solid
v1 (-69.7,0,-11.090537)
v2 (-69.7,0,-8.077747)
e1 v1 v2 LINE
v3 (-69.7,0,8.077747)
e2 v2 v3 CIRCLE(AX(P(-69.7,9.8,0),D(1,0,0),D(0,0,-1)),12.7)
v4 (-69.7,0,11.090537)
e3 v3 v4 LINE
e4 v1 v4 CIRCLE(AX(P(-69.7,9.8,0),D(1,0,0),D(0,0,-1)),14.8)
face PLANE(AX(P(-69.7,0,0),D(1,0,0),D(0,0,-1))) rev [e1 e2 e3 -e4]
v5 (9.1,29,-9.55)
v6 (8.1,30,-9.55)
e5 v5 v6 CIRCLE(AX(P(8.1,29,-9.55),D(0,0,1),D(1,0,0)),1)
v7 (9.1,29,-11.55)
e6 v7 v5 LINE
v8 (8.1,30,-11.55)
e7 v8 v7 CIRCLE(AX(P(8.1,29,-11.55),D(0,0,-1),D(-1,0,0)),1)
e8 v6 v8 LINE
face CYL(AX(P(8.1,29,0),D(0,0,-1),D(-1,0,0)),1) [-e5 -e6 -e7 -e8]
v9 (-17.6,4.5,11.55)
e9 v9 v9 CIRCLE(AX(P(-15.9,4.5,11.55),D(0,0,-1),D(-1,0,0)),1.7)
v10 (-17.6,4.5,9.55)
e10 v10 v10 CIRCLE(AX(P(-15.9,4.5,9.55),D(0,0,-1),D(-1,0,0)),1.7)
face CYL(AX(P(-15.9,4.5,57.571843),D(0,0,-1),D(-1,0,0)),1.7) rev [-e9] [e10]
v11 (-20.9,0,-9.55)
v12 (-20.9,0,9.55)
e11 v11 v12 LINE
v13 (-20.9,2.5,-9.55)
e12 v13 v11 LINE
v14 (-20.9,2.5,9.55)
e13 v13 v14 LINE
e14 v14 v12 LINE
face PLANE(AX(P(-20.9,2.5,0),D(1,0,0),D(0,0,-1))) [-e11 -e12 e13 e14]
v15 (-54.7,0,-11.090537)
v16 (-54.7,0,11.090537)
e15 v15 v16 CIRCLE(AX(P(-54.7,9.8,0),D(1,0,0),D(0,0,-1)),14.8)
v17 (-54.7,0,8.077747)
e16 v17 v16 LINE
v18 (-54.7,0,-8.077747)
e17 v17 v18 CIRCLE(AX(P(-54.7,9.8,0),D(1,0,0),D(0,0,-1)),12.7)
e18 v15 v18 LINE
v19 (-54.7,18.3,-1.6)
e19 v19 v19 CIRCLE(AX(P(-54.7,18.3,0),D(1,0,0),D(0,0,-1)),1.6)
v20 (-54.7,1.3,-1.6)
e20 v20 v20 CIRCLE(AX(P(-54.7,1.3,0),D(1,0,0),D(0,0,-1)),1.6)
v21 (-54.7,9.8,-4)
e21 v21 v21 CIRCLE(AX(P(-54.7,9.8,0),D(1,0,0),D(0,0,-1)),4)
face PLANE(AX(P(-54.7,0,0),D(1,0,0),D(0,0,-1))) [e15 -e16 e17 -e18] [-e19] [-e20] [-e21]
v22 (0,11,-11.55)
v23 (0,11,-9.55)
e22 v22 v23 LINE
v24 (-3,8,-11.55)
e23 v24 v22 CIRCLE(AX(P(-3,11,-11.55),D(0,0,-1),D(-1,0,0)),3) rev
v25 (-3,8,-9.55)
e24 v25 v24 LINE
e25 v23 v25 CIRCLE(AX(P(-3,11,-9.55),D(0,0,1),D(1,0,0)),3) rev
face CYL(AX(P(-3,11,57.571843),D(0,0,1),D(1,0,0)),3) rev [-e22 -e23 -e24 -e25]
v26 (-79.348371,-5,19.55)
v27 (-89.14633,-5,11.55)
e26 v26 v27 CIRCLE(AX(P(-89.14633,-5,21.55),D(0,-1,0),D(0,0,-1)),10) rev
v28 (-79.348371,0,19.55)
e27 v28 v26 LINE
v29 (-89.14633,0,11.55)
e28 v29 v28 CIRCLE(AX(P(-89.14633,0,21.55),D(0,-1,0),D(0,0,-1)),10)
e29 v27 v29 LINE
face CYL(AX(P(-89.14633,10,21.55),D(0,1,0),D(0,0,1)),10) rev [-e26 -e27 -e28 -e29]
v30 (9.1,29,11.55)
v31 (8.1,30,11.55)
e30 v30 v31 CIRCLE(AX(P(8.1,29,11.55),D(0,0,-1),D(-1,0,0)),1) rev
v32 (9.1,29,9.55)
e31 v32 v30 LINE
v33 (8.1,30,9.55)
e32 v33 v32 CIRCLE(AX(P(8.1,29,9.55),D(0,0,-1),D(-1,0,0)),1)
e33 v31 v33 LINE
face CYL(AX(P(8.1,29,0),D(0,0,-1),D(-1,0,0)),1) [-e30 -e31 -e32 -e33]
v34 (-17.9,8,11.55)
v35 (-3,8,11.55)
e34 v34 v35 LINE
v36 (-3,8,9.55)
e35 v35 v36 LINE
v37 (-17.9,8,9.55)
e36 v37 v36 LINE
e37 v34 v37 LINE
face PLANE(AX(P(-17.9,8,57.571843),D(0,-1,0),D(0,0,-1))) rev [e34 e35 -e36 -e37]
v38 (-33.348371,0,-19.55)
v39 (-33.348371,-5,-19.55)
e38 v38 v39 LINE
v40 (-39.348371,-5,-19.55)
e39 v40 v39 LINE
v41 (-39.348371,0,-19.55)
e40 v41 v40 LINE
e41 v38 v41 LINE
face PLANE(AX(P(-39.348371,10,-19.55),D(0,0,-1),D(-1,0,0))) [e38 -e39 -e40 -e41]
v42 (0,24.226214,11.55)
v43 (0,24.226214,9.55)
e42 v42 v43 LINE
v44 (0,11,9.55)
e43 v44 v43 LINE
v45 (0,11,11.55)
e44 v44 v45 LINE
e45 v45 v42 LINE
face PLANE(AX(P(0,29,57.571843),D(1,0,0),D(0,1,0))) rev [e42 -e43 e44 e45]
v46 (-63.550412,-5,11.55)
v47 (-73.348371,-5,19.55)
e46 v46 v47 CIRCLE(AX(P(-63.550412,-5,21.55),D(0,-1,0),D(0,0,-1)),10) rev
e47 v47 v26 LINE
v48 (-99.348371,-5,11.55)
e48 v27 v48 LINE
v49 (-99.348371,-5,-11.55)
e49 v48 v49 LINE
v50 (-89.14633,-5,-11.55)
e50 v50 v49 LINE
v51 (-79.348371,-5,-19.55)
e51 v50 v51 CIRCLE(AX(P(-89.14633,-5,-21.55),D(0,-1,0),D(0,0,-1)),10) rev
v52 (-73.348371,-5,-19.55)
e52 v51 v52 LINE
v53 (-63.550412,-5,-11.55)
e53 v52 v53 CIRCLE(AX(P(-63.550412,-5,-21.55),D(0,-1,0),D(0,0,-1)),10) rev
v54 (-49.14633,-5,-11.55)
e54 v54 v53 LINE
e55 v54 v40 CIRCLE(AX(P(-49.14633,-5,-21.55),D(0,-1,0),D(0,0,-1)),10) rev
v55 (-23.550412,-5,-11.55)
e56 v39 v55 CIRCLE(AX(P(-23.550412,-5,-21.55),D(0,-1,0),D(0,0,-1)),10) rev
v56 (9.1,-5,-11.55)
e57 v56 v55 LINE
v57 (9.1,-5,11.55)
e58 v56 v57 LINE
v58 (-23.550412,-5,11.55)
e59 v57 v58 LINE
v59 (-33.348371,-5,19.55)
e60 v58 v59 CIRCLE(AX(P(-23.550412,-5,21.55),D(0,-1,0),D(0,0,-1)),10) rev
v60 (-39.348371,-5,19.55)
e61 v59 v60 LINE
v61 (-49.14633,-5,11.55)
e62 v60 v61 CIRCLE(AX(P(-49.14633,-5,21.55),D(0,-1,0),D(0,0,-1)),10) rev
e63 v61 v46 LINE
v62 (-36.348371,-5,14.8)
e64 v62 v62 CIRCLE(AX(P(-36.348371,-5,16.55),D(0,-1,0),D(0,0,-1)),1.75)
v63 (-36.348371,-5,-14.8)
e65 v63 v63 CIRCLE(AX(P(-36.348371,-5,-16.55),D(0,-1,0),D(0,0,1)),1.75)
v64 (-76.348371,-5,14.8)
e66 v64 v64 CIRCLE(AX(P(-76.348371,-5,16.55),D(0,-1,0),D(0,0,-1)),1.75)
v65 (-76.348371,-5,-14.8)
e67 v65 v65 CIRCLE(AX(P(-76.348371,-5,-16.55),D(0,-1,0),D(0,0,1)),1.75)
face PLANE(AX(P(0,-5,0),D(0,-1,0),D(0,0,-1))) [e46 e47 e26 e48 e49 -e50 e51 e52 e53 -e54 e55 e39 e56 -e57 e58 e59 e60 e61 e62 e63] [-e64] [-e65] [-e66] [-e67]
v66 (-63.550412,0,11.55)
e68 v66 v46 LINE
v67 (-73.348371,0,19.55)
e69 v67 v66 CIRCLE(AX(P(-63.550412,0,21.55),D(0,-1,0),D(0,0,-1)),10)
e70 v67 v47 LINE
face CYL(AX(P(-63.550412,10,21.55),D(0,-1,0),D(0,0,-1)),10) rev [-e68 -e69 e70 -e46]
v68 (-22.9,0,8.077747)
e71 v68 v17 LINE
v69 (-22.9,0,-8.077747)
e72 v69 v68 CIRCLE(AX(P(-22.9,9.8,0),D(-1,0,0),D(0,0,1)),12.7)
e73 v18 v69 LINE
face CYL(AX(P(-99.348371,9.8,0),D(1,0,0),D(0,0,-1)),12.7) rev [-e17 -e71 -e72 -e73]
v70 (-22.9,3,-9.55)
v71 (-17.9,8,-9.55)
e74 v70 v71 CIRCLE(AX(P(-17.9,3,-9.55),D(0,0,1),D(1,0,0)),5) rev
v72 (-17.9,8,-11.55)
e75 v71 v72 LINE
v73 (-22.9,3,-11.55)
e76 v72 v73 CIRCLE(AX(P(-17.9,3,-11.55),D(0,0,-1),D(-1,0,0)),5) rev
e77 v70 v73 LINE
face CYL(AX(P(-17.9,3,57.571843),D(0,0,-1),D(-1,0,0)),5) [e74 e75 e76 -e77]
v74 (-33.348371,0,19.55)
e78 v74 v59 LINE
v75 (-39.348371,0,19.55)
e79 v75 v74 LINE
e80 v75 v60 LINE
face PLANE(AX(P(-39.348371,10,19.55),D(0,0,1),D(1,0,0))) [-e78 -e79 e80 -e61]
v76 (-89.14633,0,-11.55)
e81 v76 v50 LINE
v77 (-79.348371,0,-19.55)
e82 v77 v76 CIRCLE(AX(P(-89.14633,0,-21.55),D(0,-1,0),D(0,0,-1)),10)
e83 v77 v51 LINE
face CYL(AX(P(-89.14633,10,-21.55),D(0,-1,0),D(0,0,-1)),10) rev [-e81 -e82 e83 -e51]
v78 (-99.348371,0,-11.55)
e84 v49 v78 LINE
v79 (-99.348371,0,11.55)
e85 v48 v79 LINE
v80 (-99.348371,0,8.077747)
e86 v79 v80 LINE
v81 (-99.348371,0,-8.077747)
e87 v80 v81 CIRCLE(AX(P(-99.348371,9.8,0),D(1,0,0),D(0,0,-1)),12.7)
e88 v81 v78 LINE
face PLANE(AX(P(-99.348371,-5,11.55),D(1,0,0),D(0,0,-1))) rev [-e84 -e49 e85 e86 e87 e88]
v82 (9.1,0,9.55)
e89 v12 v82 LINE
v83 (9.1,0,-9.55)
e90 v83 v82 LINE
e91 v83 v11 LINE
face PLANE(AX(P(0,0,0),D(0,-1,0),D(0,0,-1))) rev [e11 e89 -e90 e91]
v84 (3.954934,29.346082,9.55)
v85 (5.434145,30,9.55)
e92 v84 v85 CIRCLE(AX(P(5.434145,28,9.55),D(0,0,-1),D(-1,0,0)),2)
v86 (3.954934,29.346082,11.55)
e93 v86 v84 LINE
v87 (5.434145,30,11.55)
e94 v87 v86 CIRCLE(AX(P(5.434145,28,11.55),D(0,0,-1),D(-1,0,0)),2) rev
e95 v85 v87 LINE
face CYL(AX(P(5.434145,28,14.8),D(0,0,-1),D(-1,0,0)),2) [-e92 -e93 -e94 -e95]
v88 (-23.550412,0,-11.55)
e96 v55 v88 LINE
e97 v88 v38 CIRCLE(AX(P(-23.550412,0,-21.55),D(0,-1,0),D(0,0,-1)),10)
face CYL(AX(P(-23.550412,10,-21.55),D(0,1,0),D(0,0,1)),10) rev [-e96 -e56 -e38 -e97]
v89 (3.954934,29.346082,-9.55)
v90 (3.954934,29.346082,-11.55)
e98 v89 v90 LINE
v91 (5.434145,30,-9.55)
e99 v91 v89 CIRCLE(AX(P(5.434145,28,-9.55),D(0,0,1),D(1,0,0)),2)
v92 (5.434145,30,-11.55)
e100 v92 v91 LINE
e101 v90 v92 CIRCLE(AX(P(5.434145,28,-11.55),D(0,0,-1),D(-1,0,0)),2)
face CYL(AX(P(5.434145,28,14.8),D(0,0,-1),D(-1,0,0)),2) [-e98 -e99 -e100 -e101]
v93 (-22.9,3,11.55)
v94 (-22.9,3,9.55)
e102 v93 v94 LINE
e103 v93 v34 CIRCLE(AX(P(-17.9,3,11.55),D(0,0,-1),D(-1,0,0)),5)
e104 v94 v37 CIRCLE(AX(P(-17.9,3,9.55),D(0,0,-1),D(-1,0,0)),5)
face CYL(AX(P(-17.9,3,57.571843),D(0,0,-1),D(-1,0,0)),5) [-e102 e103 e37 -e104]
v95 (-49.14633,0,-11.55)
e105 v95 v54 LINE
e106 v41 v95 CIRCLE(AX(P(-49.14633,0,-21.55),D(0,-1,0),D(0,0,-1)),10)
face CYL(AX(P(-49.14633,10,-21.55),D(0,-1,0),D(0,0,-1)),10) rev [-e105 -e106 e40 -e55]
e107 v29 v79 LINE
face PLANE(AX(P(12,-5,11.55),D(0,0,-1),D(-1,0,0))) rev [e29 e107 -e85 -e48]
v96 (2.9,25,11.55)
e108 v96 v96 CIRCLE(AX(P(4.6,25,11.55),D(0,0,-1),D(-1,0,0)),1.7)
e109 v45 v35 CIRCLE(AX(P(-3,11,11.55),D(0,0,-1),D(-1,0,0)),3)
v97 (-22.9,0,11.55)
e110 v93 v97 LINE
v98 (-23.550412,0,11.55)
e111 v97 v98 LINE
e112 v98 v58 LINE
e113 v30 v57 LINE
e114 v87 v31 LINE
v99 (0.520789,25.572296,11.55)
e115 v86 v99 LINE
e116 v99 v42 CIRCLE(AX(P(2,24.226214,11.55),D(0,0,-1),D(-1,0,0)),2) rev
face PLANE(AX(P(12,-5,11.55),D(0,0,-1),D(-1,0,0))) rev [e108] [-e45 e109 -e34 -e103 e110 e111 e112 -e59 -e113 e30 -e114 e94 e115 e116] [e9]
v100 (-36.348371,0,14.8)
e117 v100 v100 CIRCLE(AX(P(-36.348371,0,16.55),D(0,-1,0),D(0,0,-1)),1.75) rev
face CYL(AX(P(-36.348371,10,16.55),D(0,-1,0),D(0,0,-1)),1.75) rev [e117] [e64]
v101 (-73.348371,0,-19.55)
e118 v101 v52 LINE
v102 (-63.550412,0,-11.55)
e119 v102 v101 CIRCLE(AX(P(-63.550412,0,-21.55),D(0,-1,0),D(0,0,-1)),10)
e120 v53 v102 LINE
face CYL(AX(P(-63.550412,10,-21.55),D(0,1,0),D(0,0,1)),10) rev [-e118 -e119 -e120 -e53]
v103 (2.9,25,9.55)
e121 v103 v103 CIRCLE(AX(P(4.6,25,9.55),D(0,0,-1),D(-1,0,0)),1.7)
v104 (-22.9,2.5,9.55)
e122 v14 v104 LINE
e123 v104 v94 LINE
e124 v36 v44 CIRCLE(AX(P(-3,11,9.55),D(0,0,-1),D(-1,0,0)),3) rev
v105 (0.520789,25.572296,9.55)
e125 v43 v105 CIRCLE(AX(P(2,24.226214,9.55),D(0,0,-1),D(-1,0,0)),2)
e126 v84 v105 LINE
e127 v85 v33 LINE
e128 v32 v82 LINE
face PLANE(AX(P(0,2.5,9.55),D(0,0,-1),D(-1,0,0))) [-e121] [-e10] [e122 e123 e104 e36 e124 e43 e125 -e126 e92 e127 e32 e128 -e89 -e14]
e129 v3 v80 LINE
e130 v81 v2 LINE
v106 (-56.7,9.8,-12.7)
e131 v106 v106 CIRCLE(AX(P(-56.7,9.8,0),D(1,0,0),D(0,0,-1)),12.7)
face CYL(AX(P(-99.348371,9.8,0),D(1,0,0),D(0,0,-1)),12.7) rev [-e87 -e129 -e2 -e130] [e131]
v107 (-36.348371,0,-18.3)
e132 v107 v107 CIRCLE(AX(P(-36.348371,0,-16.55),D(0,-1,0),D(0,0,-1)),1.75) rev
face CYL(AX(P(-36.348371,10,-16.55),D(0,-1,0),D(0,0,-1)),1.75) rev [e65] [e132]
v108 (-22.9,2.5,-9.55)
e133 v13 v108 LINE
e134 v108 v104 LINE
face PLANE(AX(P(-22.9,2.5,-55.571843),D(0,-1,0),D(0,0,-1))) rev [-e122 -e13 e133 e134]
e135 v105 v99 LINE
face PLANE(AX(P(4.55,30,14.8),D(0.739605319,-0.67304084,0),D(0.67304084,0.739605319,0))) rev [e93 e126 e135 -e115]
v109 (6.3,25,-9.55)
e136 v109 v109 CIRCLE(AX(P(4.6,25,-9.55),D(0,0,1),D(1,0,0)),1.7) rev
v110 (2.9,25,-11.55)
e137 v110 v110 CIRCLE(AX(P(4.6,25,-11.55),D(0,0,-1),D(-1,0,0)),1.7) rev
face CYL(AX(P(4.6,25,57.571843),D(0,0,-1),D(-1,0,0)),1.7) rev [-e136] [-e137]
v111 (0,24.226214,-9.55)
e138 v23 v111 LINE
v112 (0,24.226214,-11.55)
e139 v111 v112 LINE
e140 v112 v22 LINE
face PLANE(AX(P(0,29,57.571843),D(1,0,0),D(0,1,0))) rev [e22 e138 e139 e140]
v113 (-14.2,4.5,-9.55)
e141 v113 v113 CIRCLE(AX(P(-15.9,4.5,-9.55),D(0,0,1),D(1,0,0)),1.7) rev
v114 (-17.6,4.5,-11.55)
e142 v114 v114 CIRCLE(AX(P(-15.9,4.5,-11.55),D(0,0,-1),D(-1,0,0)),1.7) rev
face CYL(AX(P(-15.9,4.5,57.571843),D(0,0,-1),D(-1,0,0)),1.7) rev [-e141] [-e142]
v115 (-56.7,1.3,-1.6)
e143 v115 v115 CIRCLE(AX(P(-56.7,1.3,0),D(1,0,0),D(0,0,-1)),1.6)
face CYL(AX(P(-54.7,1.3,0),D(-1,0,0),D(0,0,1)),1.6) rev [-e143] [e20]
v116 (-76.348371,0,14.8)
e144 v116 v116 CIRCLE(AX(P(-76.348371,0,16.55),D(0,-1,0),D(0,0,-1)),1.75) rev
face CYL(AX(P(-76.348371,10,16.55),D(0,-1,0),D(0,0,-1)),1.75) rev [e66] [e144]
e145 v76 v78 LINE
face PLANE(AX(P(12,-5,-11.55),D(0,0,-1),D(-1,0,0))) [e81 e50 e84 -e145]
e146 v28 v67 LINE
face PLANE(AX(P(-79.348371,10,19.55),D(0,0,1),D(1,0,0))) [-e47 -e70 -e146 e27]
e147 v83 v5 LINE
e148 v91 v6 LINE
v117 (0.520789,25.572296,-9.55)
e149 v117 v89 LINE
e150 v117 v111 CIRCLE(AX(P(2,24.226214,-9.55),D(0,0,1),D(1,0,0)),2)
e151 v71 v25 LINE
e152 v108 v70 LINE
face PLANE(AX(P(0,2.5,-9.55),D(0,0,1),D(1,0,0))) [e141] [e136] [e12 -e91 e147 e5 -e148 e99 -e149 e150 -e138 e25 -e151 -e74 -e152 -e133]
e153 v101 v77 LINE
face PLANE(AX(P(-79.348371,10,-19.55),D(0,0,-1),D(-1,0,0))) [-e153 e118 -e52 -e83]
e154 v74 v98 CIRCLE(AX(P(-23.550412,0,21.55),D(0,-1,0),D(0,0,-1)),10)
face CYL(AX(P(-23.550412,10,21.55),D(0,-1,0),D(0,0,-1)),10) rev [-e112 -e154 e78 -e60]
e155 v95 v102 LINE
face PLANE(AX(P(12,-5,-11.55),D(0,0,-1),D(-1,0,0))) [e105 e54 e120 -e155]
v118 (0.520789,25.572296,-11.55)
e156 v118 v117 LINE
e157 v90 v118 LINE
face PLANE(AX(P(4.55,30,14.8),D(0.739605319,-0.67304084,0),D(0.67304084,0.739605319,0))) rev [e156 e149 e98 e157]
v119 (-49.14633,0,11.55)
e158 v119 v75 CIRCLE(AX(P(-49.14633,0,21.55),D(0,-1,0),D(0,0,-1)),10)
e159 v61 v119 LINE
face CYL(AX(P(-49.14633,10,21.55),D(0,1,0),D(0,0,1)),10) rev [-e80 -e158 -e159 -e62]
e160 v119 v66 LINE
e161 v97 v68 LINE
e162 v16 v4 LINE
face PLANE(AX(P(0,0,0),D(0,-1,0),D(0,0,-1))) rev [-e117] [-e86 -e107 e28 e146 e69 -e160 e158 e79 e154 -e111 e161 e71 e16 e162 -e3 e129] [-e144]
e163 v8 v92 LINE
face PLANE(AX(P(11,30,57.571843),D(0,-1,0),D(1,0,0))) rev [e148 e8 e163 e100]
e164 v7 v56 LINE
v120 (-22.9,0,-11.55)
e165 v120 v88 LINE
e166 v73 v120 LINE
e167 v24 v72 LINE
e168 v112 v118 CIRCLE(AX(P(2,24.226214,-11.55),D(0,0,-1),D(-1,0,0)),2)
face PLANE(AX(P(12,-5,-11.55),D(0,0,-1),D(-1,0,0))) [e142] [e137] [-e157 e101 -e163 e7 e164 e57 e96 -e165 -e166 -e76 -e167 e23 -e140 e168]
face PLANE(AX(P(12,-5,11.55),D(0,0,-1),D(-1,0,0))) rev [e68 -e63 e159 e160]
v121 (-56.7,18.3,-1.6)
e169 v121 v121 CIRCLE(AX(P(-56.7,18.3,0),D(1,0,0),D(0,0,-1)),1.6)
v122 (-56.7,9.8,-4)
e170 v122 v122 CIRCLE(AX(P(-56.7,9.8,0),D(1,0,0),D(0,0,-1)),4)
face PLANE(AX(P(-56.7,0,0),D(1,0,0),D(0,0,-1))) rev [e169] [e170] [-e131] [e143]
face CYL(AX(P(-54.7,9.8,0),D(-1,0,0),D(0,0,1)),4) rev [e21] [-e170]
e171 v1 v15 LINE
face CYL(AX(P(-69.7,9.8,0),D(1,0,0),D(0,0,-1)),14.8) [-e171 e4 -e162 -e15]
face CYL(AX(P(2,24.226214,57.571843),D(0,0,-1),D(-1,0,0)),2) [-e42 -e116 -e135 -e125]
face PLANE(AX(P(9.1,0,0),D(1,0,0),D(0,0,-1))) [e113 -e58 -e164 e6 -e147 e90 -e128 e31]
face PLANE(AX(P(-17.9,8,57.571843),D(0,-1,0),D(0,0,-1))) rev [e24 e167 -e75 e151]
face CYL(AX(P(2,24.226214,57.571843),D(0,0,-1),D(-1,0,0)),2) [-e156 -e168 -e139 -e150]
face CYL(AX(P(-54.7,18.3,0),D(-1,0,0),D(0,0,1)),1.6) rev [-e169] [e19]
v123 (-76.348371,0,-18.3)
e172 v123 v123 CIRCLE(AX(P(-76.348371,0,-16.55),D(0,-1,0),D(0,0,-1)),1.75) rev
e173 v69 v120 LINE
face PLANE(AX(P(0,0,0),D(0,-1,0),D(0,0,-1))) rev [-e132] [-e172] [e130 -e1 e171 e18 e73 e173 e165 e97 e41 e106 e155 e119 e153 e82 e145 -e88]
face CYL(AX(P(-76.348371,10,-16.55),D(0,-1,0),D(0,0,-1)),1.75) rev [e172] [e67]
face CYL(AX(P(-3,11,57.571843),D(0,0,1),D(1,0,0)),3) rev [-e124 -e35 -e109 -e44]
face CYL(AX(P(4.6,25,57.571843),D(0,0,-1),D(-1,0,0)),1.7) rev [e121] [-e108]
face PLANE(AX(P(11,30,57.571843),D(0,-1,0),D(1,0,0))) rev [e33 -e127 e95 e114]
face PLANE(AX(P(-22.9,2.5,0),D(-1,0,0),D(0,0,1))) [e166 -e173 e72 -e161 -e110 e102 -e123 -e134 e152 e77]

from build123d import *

# Parameters (mm, degrees)
SKETCH3_W                       = 111.348371095
SKETCH3_H                       = 23.1
BOSS_EXTRUDE1_DEPTH             = 5
SKETCH3_4_W                     = 34.9
SKETCH3_4_H                     = 23.1
BOSS_EXTRUDE2_DEPTH             = 2.5
CUT_EXTRUDE1_DEPTH              = 30.8
CUT_EXTRUDE1_DEPTH_BACK         = 67.894637304
SKETCH4_4_R                     = 12.7
BOSS_EXTRUDE3_START             = -1
SKETCH4_R                       = 12.7
SKETCH4_R_2                     = 4
SKETCH4_R_3                     = 1.6
BOSS_EXTRUDE3_DEPTH             = 2
BOSS_EXTRUDE4_DEPTH             = 2
BOSS_EXTRUDE4_DEPTH_BACK        = 13
BOSS_EXTRUDE4_START             = -3
SKETCH4_3_R                     = 14.8
SKETCH4_3_R_2                   = 12.7
BOSS_EXTRUDE6_REACH             = 105.413
SKETCH6_R                       = 1.7
BOSS_EXTRUDE6_DIRECTION_2_REACH = 105.413
CUT_EXTRUDE5_START              = -9.55
SKETCH6_9_R                     = 1.7
CUT_EXTRUDE5_DEPTH              = 19.1
FILLET1_R                       = 3
SKETCH12_W                      = 31.185762671
SKETCH12_H                      = 41.424107397
CUT_EXTRUDE9_DEPTH              = 2.9
FILLET2_R                       = 1
CUT_EXTRUDE10_DEPTH             = 108.072038083
FILLET3_R                       = 2
SKETCH14_W                      = 6
SKETCH14_H                      = 8
SKETCH14_R                      = 1.75
BOSS_EXTRUDE8_DEPTH             = 5
FILLET4_R                       = 10


with BuildPart() as part:
    # Sketch3 → Boss-Extrude1 (new body)
    with BuildSketch(Plane(origin=(0, 0, 0), x_dir=(1, 0, 0), z_dir=(0, 1, 0))):
        with Locations((-43.674185548, 0)):
            Rectangle(SKETCH3_W, SKETCH3_H)
    extrude(amount=-BOSS_EXTRUDE1_DEPTH)

    # Sketch3<4> → Boss-Extrude2 (add)
    with BuildSketch(Plane(origin=(0, 0, 0), x_dir=(1, 0, 0), z_dir=(0, 1, 0))):
        with Locations((-5.45, 0)):
            Rectangle(SKETCH3_4_W, SKETCH3_4_H)
        Polygon((-20.2, 9.55), (9.3, 9.55), (10, 9.55), (10, -9.55), (9.3, -9.55), (-20.2, -9.55), (-20.9, -9.55), (-20.9, 9.55), align=None, mode=Mode.SUBTRACT)
    extrude(amount=BOSS_EXTRUDE2_DEPTH)

    # Sketch4<4> → Cut-Extrude1 (cut, two sides: drawn at the far end of the back side and taken through both)
    with BuildSketch(Plane(origin=(-53.7, 0, 0), x_dir=(0, 0, -1), z_dir=(1, 0, 0)).offset(-CUT_EXTRUDE1_DEPTH_BACK)):
        with Locations((0, 9.8)):
            Circle(SKETCH4_4_R)
    extrude(amount=CUT_EXTRUDE1_DEPTH + CUT_EXTRUDE1_DEPTH_BACK, mode=Mode.SUBTRACT)

    # Sketch4 → Boss-Extrude3 (add)
    with BuildSketch(Plane(origin=(-53.7, 0, 0), x_dir=(0, 0, -1), z_dir=(1, 0, 0)).offset(BOSS_EXTRUDE3_START)):
        with Locations((0, 9.8)):
            Circle(SKETCH4_R)
        with Locations((0, 9.8)):
            Circle(SKETCH4_R_2, mode=Mode.SUBTRACT)
        with Locations((0, 18.3)):
            Circle(SKETCH4_R_3, mode=Mode.SUBTRACT)
        with Locations((0, 1.3)):
            Circle(SKETCH4_R_3, mode=Mode.SUBTRACT)
    extrude(amount=-BOSS_EXTRUDE3_DEPTH)

    # Sketch4<3> → Boss-Extrude4 (add, two sides: drawn at the far end of the back side and taken through both)
    with BuildSketch(Plane(origin=(-53.7, 0, 0), x_dir=(0, 0, -1), z_dir=(1, 0, 0)).offset(BOSS_EXTRUDE4_START - BOSS_EXTRUDE4_DEPTH_BACK)):
        with Locations((0, 9.8)):
            Circle(SKETCH4_3_R)
        with Locations((0, 9.8)):
            Circle(SKETCH4_3_R_2, mode=Mode.SUBTRACT)
    extrude(amount=BOSS_EXTRUDE4_DEPTH + BOSS_EXTRUDE4_DEPTH_BACK)

    # Boss-Extrude6: up to this face of the body (flat: up to its plane)
    boss_extrude6_end = Plane(part.part.faces().sort_by_distance((-38.495455163, -1.99193845, 11.55))[0])
    # Sketch6 → Boss-Extrude6 (add, up to the picked face)
    with BuildSketch(Plane.XY, mode=Mode.PRIVATE) as boss_extrude6_sk1:
        with BuildLine():
            Line((-22.9, 2.5), (-22.9, 3))
            ThreePointArc((-22.9, 3), (-21.435533906, 6.535533906), (-17.9, 8))
            Line((-17.9, 8), (-8.9, 8))
            Line((-8.9, 8), (0, 8))
            Line((0, 8), (0, 29))
            ThreePointArc((0, 29), (0.292893219, 29.707106781), (1, 30))
            Line((1, 30), (11, 30))
            ThreePointArc((11, 30), (11.707106781, 29.707106781), (12, 29))
            Line((12, 29), (12, 2.5))
            Line((12, 2.5), (12, 0))
            Line((12, 0), (10, 0))
            Line((10, 0), (10, 2.5))
            Line((10, 2.5), (-22.9, 2.5))
        make_face()
        with Locations(Location((-15.9, 4.5, 0), (0, 0, 180))):
            Circle(SKETCH6_R, mode=Mode.SUBTRACT)
        with Locations(Location((4.6, 25, 0), (0, 0, 180))):
            Circle(SKETCH6_R, mode=Mode.SUBTRACT)
    boss_extrude6_tool1 = split(extrude(boss_extrude6_sk1.sketch, amount=BOSS_EXTRUDE6_REACH, mode=Mode.PRIVATE), bisect_by=boss_extrude6_end, keep=Keep.BOTH, mode=Mode.PRIVATE)
    add(boss_extrude6_tool1.solids().sort_by(Axis((1.853009, 13.07203, 0), (0, 0, 1)))[0])

    # Boss-Extrude6 direction 2: up to this face of the body (flat: up to its plane)
    boss_extrude6_direction_2_end = Plane(part.part.faces().sort_by_distance((-38.495455163, -1.99193845, -11.55))[0])
    # Sketch6 → Boss-Extrude6 direction 2 (add, up to the picked face)
    with BuildSketch(Plane.XY, mode=Mode.PRIVATE) as boss_extrude6_direction_2_sk1:
        with BuildLine():
            Line((-22.9, 2.5), (-22.9, 3))
            ThreePointArc((-22.9, 3), (-21.435533906, 6.535533906), (-17.9, 8))
            Line((-17.9, 8), (-8.9, 8))
            Line((-8.9, 8), (0, 8))
            Line((0, 8), (0, 29))
            ThreePointArc((0, 29), (0.292893219, 29.707106781), (1, 30))
            Line((1, 30), (11, 30))
            ThreePointArc((11, 30), (11.707106781, 29.707106781), (12, 29))
            Line((12, 29), (12, 2.5))
            Line((12, 2.5), (12, 0))
            Line((12, 0), (10, 0))
            Line((10, 0), (10, 2.5))
            Line((10, 2.5), (-22.9, 2.5))
        make_face()
        with Locations(Location((-15.9, 4.5, 0), (0, 0, 180))):
            Circle(SKETCH6_R, mode=Mode.SUBTRACT)
        with Locations(Location((4.6, 25, 0), (0, 0, 180))):
            Circle(SKETCH6_R, mode=Mode.SUBTRACT)
    boss_extrude6_direction_2_tool1 = split(extrude(boss_extrude6_direction_2_sk1.sketch, amount=-BOSS_EXTRUDE6_DIRECTION_2_REACH, mode=Mode.PRIVATE), bisect_by=boss_extrude6_direction_2_end, keep=Keep.BOTH, mode=Mode.PRIVATE)
    add(boss_extrude6_direction_2_tool1.solids().sort_by(Axis((1.853009, 13.07203, 0), (0, 0, -1)))[0])

    # Sketch6<9> → Cut-Extrude5 (cut)
    with BuildSketch(Plane.XY.offset(CUT_EXTRUDE5_START)):
        with BuildLine():
            Line((-22.9, 2.5), (-22.9, 3))
            ThreePointArc((-22.9, 3), (-21.435533906, 6.535533906), (-17.9, 8))
            Line((-17.9, 8), (-8.9, 8))
            Line((-8.9, 8), (0, 8))
            Line((0, 8), (0, 29))
            ThreePointArc((0, 29), (0.292893219, 29.707106781), (1, 30))
            Line((1, 30), (11, 30))
            ThreePointArc((11, 30), (11.707106781, 29.707106781), (12, 29))
            Line((12, 29), (12, 2.5))
            Line((12, 2.5), (12, 0))
            Line((12, 0), (10, 0))
            Line((10, 0), (10, 2.5))
            Line((10, 2.5), (-22.9, 2.5))
        make_face()
        with Locations(Location((-15.9, 4.5, 0), (0, 0, 180))):
            Circle(SKETCH6_9_R, mode=Mode.SUBTRACT)
        with Locations(Location((4.6, 25, 0), (0, 0, 180))):
            Circle(SKETCH6_9_R, mode=Mode.SUBTRACT)
    extrude(amount=CUT_EXTRUDE5_DEPTH, mode=Mode.SUBTRACT)

    # Fillet1
    fillet1_edges = [part.edges().sort_by_distance(p)[0] for p in [
        (0, 8, -10.55),
        (0, 8, 10.55),
    ]]
    fillet(fillet1_edges, radius=FILLET1_R)

    # Sketch12 → Cut-Extrude9 (cut)
    with BuildSketch(Plane(origin=(12, 0, 0), x_dir=(0, 0, -1), z_dir=(1, 0, 0))):
        with Locations((1.113943618, 12.240146633)):
            Rectangle(SKETCH12_W, SKETCH12_H)
    extrude(amount=-CUT_EXTRUDE9_DEPTH, mode=Mode.SUBTRACT)

    # Fillet2
    fillet2_edges = [part.edges().sort_by_distance(p)[0] for p in [
        (9.1, 30, 10.55),
        (9.1, 30, -10.55),
    ]]
    fillet(fillet2_edges, radius=FILLET2_R)

    # Sketch13 → Cut-Extrude10 (cut, through all)
    with BuildSketch(Plane(origin=(0, 0, -11.55), x_dir=(-1, 0, 0), z_dir=(0, 0, -1))):
        Polygon((-4.55, 30), (0, 25), (0, 30), align=None)
    extrude(amount=-CUT_EXTRUDE10_DEPTH, mode=Mode.SUBTRACT)

    # Fillet3
    fillet3_edges = [part.edges().sort_by_distance(p)[0] for p in [
        (0, 25, 10.55),
        (4.55, 30, 10.55),
        (4.55, 30, -10.55),
        (0, 25, -10.55),
    ]]
    fillet(fillet3_edges, radius=FILLET3_R)

    # Sketch14 → Boss-Extrude8 (add)
    # profile 1 of 4: a face of its own
    with BuildSketch(Plane.XZ.offset(5)):
        with Locations((-76.348371095, -15.55)):
            Rectangle(SKETCH14_W, SKETCH14_H)
        with Locations(Location((-76.348371095, -16.55, 0), (0, 0, 270))):
            Circle(SKETCH14_R, mode=Mode.SUBTRACT)
    # profile 2 of 4: a face of its own
    with BuildSketch(Plane.XZ.offset(5)):
        with Locations((-76.348371095, 15.55)):
            Rectangle(SKETCH14_W, SKETCH14_H)
        with Locations(Location((-76.348371095, 16.55, 0), (0, 0, 270))):
            Circle(SKETCH14_R, mode=Mode.SUBTRACT)
    # profile 3 of 4: a face of its own
    with BuildSketch(Plane.XZ.offset(5)):
        with Locations((-36.348371095, -15.55)):
            Rectangle(SKETCH14_W, SKETCH14_H)
        with Locations(Location((-36.348371095, -16.55, 0), (0, 0, 270))):
            Circle(SKETCH14_R, mode=Mode.SUBTRACT)
    # profile 4 of 4: a face of its own
    with BuildSketch(Plane.XZ.offset(5)):
        with Locations((-36.348371095, 15.55)):
            Rectangle(SKETCH14_W, SKETCH14_H)
        with Locations(Location((-36.348371095, 16.55, 0), (0, 0, 270))):
            Circle(SKETCH14_R, mode=Mode.SUBTRACT)
    extrude(amount=-BOSS_EXTRUDE8_DEPTH)

    # Fillet4
    # the kernel refuses this fillet: 10 mm, written as the material it adds along each edge
    with BuildSketch(Plane(origin=(-79.348371095, -5, 11.55), x_dir=(-1, 0, 0), z_dir=(0, 1, 0)), Plane(origin=(-73.348371095, -5, -11.55), x_dir=(1, 0, 0), z_dir=(0, 1, 0)), Plane(origin=(-39.348371095, -5, 11.55), x_dir=(-1, 0, 0), z_dir=(0, 1, 0)), Plane(origin=(-33.348371095, -5, -11.55), x_dir=(1, 0, 0), z_dir=(0, 1, 0))) as fillet4_piece_1:
        with BuildLine():
            CenterArc((9.797958971, 10), FILLET4_R, 191.536959033, 78.463040967)
            Line((0, 8), (-0.195959179, 7.96))
            ThreePointArc((-0.195959179, 7.96), (-0.2, 4), (-0.2, 0))
            Line((-0.2, 0), (0, -0.2))
            Line((0, -0.2), (9.797958971, -0.2))
            Line((9.797958971, -0.2), (9.797958971, 0))
        make_face()
    extrude(amount=5)
    with BuildSketch(Plane(origin=(-73.348371095, -5, 11.55), x_dir=(1, 0, 0), z_dir=(0, 1, 0)), Plane(origin=(-79.348371095, -5, -11.55), x_dir=(-1, 0, 0), z_dir=(0, 1, 0)), Plane(origin=(-33.348371095, -5, 11.55), x_dir=(1, 0, 0), z_dir=(0, 1, 0)), Plane(origin=(-39.348371095, -5, -11.55), x_dir=(-1, 0, 0), z_dir=(0, 1, 0))) as fillet4_piece_2:
        with BuildLine():
            CenterArc((9.797958971, -10), FILLET4_R, 90, 78.463040967)
            Line((0, -8), (-0.195959179, -7.96))
            ThreePointArc((-0.195959179, -7.96), (-0.2, -4), (-0.2, 0))
            Line((-0.2, 0), (0, 0.2))
            Line((0, 0.2), (9.797958971, 0.2))
            Line((9.797958971, 0.2), (9.797958971, 0))
        make_face()
    extrude(amount=5)


solid = part.part
